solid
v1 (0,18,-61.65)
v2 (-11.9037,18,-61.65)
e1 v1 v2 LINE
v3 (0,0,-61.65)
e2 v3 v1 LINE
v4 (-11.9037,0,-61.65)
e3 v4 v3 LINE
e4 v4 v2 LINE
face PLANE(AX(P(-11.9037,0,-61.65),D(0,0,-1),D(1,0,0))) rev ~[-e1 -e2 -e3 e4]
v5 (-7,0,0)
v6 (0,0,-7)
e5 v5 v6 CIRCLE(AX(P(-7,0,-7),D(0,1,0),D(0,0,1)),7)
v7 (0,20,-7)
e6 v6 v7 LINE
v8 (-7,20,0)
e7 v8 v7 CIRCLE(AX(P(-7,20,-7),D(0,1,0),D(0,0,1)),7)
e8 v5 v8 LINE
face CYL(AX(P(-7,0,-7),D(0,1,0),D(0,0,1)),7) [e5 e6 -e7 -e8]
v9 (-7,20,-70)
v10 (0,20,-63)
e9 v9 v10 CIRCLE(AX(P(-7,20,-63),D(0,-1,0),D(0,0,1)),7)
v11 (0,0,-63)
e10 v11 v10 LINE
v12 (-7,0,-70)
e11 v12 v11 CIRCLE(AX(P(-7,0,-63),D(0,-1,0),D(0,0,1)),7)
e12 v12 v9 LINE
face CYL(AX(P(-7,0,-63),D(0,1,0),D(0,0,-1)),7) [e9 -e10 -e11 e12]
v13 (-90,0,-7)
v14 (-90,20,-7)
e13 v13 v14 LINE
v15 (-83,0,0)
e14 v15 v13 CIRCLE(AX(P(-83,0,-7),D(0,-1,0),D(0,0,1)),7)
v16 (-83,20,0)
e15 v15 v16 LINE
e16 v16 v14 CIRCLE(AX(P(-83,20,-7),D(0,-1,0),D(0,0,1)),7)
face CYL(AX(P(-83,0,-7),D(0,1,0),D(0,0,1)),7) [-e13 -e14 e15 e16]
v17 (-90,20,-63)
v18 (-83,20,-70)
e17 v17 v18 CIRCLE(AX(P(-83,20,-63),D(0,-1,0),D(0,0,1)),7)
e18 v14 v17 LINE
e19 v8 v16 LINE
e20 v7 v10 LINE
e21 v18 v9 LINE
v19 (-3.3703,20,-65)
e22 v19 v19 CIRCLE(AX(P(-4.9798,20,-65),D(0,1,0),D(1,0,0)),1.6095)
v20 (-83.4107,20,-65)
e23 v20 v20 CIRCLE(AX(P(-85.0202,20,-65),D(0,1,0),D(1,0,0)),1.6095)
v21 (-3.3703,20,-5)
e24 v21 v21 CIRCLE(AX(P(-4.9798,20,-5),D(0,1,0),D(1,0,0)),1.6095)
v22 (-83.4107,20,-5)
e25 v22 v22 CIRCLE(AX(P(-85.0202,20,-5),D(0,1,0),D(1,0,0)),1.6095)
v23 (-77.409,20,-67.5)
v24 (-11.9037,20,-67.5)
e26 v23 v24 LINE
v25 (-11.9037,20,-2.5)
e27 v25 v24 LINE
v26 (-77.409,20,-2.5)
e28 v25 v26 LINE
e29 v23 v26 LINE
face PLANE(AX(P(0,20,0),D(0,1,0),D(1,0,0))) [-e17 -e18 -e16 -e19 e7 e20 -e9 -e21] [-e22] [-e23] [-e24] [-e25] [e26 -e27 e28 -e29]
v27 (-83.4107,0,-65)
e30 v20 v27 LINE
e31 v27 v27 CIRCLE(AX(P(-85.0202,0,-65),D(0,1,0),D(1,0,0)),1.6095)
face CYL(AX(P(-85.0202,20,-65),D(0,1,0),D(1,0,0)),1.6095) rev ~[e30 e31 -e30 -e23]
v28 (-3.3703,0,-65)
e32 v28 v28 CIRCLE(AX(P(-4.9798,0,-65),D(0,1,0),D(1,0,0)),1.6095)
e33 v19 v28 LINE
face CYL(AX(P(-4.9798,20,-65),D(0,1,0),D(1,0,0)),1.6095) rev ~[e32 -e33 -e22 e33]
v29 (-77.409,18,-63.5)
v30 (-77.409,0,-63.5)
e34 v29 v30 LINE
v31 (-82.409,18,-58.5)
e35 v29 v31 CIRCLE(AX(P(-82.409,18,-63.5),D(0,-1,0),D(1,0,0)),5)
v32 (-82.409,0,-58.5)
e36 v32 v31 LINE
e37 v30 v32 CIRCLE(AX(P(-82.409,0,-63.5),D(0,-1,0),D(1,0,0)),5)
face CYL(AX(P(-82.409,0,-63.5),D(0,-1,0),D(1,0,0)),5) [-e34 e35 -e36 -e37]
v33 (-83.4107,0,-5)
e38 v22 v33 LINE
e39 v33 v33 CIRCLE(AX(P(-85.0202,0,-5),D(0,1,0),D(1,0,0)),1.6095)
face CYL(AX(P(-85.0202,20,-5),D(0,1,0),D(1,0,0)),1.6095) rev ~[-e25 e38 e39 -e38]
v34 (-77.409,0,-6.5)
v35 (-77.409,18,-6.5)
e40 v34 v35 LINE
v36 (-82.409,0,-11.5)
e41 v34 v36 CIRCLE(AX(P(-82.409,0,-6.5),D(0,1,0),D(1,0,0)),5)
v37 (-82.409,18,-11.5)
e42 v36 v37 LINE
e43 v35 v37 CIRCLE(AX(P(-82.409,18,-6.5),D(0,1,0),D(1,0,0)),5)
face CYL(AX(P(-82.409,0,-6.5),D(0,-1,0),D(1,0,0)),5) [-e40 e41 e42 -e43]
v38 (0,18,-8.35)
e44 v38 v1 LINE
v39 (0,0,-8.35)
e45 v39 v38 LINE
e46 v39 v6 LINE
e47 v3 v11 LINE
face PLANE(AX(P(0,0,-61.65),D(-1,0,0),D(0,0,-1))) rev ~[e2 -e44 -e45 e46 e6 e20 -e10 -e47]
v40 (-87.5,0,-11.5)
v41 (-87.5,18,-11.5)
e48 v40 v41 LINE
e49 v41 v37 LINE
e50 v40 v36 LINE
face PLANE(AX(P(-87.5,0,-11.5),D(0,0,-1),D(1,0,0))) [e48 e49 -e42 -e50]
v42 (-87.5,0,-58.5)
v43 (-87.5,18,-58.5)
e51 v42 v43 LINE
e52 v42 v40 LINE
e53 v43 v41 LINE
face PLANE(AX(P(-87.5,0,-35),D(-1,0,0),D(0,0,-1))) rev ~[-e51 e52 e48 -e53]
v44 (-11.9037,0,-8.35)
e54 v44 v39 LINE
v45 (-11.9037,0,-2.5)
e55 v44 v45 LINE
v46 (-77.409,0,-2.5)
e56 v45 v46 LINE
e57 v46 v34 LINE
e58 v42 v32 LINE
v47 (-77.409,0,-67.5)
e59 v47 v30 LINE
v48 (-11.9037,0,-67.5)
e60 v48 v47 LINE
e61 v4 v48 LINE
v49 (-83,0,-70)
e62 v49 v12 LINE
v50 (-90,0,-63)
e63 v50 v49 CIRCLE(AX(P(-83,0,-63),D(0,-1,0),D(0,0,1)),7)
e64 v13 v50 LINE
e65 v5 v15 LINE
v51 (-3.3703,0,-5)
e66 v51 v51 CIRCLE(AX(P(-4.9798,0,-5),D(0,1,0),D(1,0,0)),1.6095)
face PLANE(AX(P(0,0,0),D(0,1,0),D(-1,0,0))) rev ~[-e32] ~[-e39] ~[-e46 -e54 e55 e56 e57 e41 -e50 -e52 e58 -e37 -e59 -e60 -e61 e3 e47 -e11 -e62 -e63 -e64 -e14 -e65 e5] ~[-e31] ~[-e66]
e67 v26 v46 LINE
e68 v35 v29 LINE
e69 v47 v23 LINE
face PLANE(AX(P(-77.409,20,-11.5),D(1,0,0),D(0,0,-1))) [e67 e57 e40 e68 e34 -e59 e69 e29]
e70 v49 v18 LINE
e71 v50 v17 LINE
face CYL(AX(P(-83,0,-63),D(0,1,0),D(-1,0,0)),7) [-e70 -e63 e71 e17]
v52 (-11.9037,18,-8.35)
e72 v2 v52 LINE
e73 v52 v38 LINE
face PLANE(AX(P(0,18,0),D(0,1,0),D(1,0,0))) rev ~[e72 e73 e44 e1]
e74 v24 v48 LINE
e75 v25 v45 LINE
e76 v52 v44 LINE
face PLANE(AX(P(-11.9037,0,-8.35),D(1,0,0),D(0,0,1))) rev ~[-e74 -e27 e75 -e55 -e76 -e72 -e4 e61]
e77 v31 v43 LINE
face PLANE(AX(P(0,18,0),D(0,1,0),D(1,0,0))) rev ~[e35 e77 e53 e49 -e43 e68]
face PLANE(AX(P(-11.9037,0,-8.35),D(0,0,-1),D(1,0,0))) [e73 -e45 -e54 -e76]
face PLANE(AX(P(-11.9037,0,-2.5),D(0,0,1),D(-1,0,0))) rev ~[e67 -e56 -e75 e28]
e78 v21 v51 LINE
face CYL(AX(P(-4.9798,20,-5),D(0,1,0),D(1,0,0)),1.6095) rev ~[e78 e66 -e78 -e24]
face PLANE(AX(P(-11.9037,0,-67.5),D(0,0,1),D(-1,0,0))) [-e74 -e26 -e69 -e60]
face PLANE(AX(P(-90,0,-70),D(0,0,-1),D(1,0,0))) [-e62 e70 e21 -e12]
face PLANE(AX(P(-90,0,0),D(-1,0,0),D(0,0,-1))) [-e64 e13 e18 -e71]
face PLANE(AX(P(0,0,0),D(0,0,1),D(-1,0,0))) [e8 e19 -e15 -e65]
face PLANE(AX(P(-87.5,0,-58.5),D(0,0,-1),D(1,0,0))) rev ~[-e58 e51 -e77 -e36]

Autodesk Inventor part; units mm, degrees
ref_plane "YZ Plane" through (0, 0, 0) normal (1, 0, 0) x (0, 1, 0)
ref_plane "XZ Plane" through (0, 0, 0) normal (0, 1, 0) x (-1, 0, 0)
ref_plane "XY Plane" through (0, 0, 0) normal (0, 0, 1) x (1, 0, 0)
sketch "Sketch1" plane through (0, 0, 0) normal (0, 1, 0) x (-1, 0, 0)
  line L0 (0, 0) -> (90, 0)
  line L1 (90, 0) -> (90, -70)
  line L2 (90, -70) -> (0, -70)
  circle A0 centre (85, -65) radius 1.6095
  circle A1 centre (85, -5) radius 1.6095
  circle A2 centre (5, -65) radius 1.6095
  circle A3 centre (5, -5) radius 1.6095
  line L3 (11.9037, -61.65) -> (11.9037, -67.5)
  line L4 (11.9037, -67.5) -> (77.409, -67.5)
  line L5 (77.409, -67.5) -> (77.409, -58.5)
  line L6 (87.5, -35) -> (87.5, -58.5)
  line L7 (87.5, -58.5) -> (77.409, -58.5)
  line L8 (11.9037, -61.65) -> (0, -61.65)
  line L9 (0, -61.65) -> (0, -70)
  line L10 (11.9037, -8.35) -> (11.9037, -2.5)
  line L11 (11.9037, -2.5) -> (77.409, -2.5)
  line L12 (77.409, -2.5) -> (77.409, -11.5)
  line L13 (87.5, -35) -> (87.5, -11.5)
  line L14 (87.5, -11.5) -> (77.409, -11.5)
  line L15 (11.9037, -8.35) -> (0, -8.35)
  line L16 (0, -8.35) -> (0, 0)
  line L17 (99.038, -35) -> (-9.0118, -35) construction
  point P0 (11.9037, -5.425)
  dimension "d34" = 70
  dimension "d35" = 60
  dimension "d37" = 10.091
  dimension "d38" = 65.5053
  dimension "d39" = 60
  dimension "d40" = 70
  dimension "d41" = 9
  dimension "d43" = 90
  dimension "d44" = 11.9037
  dimension "d45" = 3.219
  dimension "d46" = 47
  dimension "d47" = 5.85
  dimension "d48" = 8.35
  dimension "d49" = 5
  dimension "d50" = 5
  dimension "d51" = 5
  dimension "d52" = 5
extrude "Extrusion1" add sketch "Sketch1" along normal blind 20 contours L0 L1 L2 L9 L8 L3 L4 L5 L7 L6 L13 L14 L12 L11 L10 L15 L16 | A0 | A1 | A2 | A3
sketch "Sketch2" plane through (0, 20, 0) normal (0, 1, 0) x (1, 0, 0)
  line L0 (0, 70) -> (-90, 70) projected
  circle A0 centre (-4.9798, 65) radius 1.6095
  line L1 (-90, 70) -> (-90, 0) projected
  circle A1 centre (-85.0202, 65) radius 1.6095
  circle A2 centre (-4.9798, 5) radius 1.6095
  circle A3 centre (-85.0202, 5) radius 1.6095
  point P0 (0, 0)
extrude "Extrusion2" cut sketch "Sketch2" against normal blind 30
fillet "Fillet1" radius 7 4 edges at (-90, 10, 0) (-90, 10, -70) (0, 10, -70) (0, 10, 0)
sketch "Sketch4" plane through (0, 20, 0) normal (0, 1, 0) x (1, 0, 0)
  line L0 (-77.409, 11.5) -> (-77.409, 58.5)
  line L1 (-77.409, 58.5) -> (-87.5, 58.5)
  line L2 (-87.5, 58.5) -> (-87.5, 11.5)
  line L3 (-87.5, 11.5) -> (-77.409, 11.5)
  point P0 (0, 0)
extrude "Extrusion3" add sketch "Sketch4" against normal blind 2
sketch "Sketch5" plane through (0, 20, 0) normal (0, 1, 0) x (1, 0, 0)
  line L0 (-11.9037, 61.65) -> (-11.9037, 8.35)
  line L1 (-11.9037, 8.35) -> (0, 8.35)
  line L2 (0, 8.35) -> (0, 61.65)
  line L3 (0, 61.65) -> (-11.9037, 61.65)
  line L4 (-11.9037, 61.65) -> (-77.409, 61.65)
  line L5 (-77.409, 58.5) -> (-77.409, 67.5) projected
  line L6 (-77.409, 67.5) -> (-77.409, 61.65)
  line L7 (-11.9037, 61.65) -> (-11.9037, 67.5)
  line L8 (-11.9037, 67.5) -> (-77.409, 67.5)
  line L9 (-11.9037, 2.5) -> (-77.409, 2.5) projected
  line L10 (-11.9037, 8.35) -> (-11.9037, 2.5)
  line L11 (-11.9037, 2.5) -> (-77.409, 2.5)
  line L12 (-77.409, 2.5) -> (-77.409, 8.35)
  line L13 (-77.409, 8.35) -> (-11.9037, 8.35)
  point P0 (0, 0)
extrude "Extrusion4" add sketch "Sketch5" against normal blind 2
fillet "Fillet2" radius 5 1 edges at (-77.409, 9, -58.5)
fillet "Fillet3" radius 5 1 edges at (-77.409, 9, -11.5)
fillet "Fillet4" radius 5 4 edges at (-77.409, 19, -61.65) (-11.9037, 19, -61.65) (-11.9037, 19, -8.35) (-77.409, 19, -8.35)
sketch "Sketch6" plane through (0, 20, 0) normal (0, 1, 0) x (1, 0, 0)
  line L0 (-77.409, 67.5) -> (-11.9037, 67.5)
  line L1 (-11.9037, 67.5) -> (-11.9037, 2.5)
  line L2 (-11.9037, 2.5) -> (-77.409, 2.5)
  line L3 (-77.409, 2.5) -> (-77.409, 67.5)
  point P0 (0, 0)
extrude "Extrusion5" cut sketch "Sketch6" against normal blind 10
properties part number "Módulo de fixação Eletrônicos" material "PPS Plastic"
